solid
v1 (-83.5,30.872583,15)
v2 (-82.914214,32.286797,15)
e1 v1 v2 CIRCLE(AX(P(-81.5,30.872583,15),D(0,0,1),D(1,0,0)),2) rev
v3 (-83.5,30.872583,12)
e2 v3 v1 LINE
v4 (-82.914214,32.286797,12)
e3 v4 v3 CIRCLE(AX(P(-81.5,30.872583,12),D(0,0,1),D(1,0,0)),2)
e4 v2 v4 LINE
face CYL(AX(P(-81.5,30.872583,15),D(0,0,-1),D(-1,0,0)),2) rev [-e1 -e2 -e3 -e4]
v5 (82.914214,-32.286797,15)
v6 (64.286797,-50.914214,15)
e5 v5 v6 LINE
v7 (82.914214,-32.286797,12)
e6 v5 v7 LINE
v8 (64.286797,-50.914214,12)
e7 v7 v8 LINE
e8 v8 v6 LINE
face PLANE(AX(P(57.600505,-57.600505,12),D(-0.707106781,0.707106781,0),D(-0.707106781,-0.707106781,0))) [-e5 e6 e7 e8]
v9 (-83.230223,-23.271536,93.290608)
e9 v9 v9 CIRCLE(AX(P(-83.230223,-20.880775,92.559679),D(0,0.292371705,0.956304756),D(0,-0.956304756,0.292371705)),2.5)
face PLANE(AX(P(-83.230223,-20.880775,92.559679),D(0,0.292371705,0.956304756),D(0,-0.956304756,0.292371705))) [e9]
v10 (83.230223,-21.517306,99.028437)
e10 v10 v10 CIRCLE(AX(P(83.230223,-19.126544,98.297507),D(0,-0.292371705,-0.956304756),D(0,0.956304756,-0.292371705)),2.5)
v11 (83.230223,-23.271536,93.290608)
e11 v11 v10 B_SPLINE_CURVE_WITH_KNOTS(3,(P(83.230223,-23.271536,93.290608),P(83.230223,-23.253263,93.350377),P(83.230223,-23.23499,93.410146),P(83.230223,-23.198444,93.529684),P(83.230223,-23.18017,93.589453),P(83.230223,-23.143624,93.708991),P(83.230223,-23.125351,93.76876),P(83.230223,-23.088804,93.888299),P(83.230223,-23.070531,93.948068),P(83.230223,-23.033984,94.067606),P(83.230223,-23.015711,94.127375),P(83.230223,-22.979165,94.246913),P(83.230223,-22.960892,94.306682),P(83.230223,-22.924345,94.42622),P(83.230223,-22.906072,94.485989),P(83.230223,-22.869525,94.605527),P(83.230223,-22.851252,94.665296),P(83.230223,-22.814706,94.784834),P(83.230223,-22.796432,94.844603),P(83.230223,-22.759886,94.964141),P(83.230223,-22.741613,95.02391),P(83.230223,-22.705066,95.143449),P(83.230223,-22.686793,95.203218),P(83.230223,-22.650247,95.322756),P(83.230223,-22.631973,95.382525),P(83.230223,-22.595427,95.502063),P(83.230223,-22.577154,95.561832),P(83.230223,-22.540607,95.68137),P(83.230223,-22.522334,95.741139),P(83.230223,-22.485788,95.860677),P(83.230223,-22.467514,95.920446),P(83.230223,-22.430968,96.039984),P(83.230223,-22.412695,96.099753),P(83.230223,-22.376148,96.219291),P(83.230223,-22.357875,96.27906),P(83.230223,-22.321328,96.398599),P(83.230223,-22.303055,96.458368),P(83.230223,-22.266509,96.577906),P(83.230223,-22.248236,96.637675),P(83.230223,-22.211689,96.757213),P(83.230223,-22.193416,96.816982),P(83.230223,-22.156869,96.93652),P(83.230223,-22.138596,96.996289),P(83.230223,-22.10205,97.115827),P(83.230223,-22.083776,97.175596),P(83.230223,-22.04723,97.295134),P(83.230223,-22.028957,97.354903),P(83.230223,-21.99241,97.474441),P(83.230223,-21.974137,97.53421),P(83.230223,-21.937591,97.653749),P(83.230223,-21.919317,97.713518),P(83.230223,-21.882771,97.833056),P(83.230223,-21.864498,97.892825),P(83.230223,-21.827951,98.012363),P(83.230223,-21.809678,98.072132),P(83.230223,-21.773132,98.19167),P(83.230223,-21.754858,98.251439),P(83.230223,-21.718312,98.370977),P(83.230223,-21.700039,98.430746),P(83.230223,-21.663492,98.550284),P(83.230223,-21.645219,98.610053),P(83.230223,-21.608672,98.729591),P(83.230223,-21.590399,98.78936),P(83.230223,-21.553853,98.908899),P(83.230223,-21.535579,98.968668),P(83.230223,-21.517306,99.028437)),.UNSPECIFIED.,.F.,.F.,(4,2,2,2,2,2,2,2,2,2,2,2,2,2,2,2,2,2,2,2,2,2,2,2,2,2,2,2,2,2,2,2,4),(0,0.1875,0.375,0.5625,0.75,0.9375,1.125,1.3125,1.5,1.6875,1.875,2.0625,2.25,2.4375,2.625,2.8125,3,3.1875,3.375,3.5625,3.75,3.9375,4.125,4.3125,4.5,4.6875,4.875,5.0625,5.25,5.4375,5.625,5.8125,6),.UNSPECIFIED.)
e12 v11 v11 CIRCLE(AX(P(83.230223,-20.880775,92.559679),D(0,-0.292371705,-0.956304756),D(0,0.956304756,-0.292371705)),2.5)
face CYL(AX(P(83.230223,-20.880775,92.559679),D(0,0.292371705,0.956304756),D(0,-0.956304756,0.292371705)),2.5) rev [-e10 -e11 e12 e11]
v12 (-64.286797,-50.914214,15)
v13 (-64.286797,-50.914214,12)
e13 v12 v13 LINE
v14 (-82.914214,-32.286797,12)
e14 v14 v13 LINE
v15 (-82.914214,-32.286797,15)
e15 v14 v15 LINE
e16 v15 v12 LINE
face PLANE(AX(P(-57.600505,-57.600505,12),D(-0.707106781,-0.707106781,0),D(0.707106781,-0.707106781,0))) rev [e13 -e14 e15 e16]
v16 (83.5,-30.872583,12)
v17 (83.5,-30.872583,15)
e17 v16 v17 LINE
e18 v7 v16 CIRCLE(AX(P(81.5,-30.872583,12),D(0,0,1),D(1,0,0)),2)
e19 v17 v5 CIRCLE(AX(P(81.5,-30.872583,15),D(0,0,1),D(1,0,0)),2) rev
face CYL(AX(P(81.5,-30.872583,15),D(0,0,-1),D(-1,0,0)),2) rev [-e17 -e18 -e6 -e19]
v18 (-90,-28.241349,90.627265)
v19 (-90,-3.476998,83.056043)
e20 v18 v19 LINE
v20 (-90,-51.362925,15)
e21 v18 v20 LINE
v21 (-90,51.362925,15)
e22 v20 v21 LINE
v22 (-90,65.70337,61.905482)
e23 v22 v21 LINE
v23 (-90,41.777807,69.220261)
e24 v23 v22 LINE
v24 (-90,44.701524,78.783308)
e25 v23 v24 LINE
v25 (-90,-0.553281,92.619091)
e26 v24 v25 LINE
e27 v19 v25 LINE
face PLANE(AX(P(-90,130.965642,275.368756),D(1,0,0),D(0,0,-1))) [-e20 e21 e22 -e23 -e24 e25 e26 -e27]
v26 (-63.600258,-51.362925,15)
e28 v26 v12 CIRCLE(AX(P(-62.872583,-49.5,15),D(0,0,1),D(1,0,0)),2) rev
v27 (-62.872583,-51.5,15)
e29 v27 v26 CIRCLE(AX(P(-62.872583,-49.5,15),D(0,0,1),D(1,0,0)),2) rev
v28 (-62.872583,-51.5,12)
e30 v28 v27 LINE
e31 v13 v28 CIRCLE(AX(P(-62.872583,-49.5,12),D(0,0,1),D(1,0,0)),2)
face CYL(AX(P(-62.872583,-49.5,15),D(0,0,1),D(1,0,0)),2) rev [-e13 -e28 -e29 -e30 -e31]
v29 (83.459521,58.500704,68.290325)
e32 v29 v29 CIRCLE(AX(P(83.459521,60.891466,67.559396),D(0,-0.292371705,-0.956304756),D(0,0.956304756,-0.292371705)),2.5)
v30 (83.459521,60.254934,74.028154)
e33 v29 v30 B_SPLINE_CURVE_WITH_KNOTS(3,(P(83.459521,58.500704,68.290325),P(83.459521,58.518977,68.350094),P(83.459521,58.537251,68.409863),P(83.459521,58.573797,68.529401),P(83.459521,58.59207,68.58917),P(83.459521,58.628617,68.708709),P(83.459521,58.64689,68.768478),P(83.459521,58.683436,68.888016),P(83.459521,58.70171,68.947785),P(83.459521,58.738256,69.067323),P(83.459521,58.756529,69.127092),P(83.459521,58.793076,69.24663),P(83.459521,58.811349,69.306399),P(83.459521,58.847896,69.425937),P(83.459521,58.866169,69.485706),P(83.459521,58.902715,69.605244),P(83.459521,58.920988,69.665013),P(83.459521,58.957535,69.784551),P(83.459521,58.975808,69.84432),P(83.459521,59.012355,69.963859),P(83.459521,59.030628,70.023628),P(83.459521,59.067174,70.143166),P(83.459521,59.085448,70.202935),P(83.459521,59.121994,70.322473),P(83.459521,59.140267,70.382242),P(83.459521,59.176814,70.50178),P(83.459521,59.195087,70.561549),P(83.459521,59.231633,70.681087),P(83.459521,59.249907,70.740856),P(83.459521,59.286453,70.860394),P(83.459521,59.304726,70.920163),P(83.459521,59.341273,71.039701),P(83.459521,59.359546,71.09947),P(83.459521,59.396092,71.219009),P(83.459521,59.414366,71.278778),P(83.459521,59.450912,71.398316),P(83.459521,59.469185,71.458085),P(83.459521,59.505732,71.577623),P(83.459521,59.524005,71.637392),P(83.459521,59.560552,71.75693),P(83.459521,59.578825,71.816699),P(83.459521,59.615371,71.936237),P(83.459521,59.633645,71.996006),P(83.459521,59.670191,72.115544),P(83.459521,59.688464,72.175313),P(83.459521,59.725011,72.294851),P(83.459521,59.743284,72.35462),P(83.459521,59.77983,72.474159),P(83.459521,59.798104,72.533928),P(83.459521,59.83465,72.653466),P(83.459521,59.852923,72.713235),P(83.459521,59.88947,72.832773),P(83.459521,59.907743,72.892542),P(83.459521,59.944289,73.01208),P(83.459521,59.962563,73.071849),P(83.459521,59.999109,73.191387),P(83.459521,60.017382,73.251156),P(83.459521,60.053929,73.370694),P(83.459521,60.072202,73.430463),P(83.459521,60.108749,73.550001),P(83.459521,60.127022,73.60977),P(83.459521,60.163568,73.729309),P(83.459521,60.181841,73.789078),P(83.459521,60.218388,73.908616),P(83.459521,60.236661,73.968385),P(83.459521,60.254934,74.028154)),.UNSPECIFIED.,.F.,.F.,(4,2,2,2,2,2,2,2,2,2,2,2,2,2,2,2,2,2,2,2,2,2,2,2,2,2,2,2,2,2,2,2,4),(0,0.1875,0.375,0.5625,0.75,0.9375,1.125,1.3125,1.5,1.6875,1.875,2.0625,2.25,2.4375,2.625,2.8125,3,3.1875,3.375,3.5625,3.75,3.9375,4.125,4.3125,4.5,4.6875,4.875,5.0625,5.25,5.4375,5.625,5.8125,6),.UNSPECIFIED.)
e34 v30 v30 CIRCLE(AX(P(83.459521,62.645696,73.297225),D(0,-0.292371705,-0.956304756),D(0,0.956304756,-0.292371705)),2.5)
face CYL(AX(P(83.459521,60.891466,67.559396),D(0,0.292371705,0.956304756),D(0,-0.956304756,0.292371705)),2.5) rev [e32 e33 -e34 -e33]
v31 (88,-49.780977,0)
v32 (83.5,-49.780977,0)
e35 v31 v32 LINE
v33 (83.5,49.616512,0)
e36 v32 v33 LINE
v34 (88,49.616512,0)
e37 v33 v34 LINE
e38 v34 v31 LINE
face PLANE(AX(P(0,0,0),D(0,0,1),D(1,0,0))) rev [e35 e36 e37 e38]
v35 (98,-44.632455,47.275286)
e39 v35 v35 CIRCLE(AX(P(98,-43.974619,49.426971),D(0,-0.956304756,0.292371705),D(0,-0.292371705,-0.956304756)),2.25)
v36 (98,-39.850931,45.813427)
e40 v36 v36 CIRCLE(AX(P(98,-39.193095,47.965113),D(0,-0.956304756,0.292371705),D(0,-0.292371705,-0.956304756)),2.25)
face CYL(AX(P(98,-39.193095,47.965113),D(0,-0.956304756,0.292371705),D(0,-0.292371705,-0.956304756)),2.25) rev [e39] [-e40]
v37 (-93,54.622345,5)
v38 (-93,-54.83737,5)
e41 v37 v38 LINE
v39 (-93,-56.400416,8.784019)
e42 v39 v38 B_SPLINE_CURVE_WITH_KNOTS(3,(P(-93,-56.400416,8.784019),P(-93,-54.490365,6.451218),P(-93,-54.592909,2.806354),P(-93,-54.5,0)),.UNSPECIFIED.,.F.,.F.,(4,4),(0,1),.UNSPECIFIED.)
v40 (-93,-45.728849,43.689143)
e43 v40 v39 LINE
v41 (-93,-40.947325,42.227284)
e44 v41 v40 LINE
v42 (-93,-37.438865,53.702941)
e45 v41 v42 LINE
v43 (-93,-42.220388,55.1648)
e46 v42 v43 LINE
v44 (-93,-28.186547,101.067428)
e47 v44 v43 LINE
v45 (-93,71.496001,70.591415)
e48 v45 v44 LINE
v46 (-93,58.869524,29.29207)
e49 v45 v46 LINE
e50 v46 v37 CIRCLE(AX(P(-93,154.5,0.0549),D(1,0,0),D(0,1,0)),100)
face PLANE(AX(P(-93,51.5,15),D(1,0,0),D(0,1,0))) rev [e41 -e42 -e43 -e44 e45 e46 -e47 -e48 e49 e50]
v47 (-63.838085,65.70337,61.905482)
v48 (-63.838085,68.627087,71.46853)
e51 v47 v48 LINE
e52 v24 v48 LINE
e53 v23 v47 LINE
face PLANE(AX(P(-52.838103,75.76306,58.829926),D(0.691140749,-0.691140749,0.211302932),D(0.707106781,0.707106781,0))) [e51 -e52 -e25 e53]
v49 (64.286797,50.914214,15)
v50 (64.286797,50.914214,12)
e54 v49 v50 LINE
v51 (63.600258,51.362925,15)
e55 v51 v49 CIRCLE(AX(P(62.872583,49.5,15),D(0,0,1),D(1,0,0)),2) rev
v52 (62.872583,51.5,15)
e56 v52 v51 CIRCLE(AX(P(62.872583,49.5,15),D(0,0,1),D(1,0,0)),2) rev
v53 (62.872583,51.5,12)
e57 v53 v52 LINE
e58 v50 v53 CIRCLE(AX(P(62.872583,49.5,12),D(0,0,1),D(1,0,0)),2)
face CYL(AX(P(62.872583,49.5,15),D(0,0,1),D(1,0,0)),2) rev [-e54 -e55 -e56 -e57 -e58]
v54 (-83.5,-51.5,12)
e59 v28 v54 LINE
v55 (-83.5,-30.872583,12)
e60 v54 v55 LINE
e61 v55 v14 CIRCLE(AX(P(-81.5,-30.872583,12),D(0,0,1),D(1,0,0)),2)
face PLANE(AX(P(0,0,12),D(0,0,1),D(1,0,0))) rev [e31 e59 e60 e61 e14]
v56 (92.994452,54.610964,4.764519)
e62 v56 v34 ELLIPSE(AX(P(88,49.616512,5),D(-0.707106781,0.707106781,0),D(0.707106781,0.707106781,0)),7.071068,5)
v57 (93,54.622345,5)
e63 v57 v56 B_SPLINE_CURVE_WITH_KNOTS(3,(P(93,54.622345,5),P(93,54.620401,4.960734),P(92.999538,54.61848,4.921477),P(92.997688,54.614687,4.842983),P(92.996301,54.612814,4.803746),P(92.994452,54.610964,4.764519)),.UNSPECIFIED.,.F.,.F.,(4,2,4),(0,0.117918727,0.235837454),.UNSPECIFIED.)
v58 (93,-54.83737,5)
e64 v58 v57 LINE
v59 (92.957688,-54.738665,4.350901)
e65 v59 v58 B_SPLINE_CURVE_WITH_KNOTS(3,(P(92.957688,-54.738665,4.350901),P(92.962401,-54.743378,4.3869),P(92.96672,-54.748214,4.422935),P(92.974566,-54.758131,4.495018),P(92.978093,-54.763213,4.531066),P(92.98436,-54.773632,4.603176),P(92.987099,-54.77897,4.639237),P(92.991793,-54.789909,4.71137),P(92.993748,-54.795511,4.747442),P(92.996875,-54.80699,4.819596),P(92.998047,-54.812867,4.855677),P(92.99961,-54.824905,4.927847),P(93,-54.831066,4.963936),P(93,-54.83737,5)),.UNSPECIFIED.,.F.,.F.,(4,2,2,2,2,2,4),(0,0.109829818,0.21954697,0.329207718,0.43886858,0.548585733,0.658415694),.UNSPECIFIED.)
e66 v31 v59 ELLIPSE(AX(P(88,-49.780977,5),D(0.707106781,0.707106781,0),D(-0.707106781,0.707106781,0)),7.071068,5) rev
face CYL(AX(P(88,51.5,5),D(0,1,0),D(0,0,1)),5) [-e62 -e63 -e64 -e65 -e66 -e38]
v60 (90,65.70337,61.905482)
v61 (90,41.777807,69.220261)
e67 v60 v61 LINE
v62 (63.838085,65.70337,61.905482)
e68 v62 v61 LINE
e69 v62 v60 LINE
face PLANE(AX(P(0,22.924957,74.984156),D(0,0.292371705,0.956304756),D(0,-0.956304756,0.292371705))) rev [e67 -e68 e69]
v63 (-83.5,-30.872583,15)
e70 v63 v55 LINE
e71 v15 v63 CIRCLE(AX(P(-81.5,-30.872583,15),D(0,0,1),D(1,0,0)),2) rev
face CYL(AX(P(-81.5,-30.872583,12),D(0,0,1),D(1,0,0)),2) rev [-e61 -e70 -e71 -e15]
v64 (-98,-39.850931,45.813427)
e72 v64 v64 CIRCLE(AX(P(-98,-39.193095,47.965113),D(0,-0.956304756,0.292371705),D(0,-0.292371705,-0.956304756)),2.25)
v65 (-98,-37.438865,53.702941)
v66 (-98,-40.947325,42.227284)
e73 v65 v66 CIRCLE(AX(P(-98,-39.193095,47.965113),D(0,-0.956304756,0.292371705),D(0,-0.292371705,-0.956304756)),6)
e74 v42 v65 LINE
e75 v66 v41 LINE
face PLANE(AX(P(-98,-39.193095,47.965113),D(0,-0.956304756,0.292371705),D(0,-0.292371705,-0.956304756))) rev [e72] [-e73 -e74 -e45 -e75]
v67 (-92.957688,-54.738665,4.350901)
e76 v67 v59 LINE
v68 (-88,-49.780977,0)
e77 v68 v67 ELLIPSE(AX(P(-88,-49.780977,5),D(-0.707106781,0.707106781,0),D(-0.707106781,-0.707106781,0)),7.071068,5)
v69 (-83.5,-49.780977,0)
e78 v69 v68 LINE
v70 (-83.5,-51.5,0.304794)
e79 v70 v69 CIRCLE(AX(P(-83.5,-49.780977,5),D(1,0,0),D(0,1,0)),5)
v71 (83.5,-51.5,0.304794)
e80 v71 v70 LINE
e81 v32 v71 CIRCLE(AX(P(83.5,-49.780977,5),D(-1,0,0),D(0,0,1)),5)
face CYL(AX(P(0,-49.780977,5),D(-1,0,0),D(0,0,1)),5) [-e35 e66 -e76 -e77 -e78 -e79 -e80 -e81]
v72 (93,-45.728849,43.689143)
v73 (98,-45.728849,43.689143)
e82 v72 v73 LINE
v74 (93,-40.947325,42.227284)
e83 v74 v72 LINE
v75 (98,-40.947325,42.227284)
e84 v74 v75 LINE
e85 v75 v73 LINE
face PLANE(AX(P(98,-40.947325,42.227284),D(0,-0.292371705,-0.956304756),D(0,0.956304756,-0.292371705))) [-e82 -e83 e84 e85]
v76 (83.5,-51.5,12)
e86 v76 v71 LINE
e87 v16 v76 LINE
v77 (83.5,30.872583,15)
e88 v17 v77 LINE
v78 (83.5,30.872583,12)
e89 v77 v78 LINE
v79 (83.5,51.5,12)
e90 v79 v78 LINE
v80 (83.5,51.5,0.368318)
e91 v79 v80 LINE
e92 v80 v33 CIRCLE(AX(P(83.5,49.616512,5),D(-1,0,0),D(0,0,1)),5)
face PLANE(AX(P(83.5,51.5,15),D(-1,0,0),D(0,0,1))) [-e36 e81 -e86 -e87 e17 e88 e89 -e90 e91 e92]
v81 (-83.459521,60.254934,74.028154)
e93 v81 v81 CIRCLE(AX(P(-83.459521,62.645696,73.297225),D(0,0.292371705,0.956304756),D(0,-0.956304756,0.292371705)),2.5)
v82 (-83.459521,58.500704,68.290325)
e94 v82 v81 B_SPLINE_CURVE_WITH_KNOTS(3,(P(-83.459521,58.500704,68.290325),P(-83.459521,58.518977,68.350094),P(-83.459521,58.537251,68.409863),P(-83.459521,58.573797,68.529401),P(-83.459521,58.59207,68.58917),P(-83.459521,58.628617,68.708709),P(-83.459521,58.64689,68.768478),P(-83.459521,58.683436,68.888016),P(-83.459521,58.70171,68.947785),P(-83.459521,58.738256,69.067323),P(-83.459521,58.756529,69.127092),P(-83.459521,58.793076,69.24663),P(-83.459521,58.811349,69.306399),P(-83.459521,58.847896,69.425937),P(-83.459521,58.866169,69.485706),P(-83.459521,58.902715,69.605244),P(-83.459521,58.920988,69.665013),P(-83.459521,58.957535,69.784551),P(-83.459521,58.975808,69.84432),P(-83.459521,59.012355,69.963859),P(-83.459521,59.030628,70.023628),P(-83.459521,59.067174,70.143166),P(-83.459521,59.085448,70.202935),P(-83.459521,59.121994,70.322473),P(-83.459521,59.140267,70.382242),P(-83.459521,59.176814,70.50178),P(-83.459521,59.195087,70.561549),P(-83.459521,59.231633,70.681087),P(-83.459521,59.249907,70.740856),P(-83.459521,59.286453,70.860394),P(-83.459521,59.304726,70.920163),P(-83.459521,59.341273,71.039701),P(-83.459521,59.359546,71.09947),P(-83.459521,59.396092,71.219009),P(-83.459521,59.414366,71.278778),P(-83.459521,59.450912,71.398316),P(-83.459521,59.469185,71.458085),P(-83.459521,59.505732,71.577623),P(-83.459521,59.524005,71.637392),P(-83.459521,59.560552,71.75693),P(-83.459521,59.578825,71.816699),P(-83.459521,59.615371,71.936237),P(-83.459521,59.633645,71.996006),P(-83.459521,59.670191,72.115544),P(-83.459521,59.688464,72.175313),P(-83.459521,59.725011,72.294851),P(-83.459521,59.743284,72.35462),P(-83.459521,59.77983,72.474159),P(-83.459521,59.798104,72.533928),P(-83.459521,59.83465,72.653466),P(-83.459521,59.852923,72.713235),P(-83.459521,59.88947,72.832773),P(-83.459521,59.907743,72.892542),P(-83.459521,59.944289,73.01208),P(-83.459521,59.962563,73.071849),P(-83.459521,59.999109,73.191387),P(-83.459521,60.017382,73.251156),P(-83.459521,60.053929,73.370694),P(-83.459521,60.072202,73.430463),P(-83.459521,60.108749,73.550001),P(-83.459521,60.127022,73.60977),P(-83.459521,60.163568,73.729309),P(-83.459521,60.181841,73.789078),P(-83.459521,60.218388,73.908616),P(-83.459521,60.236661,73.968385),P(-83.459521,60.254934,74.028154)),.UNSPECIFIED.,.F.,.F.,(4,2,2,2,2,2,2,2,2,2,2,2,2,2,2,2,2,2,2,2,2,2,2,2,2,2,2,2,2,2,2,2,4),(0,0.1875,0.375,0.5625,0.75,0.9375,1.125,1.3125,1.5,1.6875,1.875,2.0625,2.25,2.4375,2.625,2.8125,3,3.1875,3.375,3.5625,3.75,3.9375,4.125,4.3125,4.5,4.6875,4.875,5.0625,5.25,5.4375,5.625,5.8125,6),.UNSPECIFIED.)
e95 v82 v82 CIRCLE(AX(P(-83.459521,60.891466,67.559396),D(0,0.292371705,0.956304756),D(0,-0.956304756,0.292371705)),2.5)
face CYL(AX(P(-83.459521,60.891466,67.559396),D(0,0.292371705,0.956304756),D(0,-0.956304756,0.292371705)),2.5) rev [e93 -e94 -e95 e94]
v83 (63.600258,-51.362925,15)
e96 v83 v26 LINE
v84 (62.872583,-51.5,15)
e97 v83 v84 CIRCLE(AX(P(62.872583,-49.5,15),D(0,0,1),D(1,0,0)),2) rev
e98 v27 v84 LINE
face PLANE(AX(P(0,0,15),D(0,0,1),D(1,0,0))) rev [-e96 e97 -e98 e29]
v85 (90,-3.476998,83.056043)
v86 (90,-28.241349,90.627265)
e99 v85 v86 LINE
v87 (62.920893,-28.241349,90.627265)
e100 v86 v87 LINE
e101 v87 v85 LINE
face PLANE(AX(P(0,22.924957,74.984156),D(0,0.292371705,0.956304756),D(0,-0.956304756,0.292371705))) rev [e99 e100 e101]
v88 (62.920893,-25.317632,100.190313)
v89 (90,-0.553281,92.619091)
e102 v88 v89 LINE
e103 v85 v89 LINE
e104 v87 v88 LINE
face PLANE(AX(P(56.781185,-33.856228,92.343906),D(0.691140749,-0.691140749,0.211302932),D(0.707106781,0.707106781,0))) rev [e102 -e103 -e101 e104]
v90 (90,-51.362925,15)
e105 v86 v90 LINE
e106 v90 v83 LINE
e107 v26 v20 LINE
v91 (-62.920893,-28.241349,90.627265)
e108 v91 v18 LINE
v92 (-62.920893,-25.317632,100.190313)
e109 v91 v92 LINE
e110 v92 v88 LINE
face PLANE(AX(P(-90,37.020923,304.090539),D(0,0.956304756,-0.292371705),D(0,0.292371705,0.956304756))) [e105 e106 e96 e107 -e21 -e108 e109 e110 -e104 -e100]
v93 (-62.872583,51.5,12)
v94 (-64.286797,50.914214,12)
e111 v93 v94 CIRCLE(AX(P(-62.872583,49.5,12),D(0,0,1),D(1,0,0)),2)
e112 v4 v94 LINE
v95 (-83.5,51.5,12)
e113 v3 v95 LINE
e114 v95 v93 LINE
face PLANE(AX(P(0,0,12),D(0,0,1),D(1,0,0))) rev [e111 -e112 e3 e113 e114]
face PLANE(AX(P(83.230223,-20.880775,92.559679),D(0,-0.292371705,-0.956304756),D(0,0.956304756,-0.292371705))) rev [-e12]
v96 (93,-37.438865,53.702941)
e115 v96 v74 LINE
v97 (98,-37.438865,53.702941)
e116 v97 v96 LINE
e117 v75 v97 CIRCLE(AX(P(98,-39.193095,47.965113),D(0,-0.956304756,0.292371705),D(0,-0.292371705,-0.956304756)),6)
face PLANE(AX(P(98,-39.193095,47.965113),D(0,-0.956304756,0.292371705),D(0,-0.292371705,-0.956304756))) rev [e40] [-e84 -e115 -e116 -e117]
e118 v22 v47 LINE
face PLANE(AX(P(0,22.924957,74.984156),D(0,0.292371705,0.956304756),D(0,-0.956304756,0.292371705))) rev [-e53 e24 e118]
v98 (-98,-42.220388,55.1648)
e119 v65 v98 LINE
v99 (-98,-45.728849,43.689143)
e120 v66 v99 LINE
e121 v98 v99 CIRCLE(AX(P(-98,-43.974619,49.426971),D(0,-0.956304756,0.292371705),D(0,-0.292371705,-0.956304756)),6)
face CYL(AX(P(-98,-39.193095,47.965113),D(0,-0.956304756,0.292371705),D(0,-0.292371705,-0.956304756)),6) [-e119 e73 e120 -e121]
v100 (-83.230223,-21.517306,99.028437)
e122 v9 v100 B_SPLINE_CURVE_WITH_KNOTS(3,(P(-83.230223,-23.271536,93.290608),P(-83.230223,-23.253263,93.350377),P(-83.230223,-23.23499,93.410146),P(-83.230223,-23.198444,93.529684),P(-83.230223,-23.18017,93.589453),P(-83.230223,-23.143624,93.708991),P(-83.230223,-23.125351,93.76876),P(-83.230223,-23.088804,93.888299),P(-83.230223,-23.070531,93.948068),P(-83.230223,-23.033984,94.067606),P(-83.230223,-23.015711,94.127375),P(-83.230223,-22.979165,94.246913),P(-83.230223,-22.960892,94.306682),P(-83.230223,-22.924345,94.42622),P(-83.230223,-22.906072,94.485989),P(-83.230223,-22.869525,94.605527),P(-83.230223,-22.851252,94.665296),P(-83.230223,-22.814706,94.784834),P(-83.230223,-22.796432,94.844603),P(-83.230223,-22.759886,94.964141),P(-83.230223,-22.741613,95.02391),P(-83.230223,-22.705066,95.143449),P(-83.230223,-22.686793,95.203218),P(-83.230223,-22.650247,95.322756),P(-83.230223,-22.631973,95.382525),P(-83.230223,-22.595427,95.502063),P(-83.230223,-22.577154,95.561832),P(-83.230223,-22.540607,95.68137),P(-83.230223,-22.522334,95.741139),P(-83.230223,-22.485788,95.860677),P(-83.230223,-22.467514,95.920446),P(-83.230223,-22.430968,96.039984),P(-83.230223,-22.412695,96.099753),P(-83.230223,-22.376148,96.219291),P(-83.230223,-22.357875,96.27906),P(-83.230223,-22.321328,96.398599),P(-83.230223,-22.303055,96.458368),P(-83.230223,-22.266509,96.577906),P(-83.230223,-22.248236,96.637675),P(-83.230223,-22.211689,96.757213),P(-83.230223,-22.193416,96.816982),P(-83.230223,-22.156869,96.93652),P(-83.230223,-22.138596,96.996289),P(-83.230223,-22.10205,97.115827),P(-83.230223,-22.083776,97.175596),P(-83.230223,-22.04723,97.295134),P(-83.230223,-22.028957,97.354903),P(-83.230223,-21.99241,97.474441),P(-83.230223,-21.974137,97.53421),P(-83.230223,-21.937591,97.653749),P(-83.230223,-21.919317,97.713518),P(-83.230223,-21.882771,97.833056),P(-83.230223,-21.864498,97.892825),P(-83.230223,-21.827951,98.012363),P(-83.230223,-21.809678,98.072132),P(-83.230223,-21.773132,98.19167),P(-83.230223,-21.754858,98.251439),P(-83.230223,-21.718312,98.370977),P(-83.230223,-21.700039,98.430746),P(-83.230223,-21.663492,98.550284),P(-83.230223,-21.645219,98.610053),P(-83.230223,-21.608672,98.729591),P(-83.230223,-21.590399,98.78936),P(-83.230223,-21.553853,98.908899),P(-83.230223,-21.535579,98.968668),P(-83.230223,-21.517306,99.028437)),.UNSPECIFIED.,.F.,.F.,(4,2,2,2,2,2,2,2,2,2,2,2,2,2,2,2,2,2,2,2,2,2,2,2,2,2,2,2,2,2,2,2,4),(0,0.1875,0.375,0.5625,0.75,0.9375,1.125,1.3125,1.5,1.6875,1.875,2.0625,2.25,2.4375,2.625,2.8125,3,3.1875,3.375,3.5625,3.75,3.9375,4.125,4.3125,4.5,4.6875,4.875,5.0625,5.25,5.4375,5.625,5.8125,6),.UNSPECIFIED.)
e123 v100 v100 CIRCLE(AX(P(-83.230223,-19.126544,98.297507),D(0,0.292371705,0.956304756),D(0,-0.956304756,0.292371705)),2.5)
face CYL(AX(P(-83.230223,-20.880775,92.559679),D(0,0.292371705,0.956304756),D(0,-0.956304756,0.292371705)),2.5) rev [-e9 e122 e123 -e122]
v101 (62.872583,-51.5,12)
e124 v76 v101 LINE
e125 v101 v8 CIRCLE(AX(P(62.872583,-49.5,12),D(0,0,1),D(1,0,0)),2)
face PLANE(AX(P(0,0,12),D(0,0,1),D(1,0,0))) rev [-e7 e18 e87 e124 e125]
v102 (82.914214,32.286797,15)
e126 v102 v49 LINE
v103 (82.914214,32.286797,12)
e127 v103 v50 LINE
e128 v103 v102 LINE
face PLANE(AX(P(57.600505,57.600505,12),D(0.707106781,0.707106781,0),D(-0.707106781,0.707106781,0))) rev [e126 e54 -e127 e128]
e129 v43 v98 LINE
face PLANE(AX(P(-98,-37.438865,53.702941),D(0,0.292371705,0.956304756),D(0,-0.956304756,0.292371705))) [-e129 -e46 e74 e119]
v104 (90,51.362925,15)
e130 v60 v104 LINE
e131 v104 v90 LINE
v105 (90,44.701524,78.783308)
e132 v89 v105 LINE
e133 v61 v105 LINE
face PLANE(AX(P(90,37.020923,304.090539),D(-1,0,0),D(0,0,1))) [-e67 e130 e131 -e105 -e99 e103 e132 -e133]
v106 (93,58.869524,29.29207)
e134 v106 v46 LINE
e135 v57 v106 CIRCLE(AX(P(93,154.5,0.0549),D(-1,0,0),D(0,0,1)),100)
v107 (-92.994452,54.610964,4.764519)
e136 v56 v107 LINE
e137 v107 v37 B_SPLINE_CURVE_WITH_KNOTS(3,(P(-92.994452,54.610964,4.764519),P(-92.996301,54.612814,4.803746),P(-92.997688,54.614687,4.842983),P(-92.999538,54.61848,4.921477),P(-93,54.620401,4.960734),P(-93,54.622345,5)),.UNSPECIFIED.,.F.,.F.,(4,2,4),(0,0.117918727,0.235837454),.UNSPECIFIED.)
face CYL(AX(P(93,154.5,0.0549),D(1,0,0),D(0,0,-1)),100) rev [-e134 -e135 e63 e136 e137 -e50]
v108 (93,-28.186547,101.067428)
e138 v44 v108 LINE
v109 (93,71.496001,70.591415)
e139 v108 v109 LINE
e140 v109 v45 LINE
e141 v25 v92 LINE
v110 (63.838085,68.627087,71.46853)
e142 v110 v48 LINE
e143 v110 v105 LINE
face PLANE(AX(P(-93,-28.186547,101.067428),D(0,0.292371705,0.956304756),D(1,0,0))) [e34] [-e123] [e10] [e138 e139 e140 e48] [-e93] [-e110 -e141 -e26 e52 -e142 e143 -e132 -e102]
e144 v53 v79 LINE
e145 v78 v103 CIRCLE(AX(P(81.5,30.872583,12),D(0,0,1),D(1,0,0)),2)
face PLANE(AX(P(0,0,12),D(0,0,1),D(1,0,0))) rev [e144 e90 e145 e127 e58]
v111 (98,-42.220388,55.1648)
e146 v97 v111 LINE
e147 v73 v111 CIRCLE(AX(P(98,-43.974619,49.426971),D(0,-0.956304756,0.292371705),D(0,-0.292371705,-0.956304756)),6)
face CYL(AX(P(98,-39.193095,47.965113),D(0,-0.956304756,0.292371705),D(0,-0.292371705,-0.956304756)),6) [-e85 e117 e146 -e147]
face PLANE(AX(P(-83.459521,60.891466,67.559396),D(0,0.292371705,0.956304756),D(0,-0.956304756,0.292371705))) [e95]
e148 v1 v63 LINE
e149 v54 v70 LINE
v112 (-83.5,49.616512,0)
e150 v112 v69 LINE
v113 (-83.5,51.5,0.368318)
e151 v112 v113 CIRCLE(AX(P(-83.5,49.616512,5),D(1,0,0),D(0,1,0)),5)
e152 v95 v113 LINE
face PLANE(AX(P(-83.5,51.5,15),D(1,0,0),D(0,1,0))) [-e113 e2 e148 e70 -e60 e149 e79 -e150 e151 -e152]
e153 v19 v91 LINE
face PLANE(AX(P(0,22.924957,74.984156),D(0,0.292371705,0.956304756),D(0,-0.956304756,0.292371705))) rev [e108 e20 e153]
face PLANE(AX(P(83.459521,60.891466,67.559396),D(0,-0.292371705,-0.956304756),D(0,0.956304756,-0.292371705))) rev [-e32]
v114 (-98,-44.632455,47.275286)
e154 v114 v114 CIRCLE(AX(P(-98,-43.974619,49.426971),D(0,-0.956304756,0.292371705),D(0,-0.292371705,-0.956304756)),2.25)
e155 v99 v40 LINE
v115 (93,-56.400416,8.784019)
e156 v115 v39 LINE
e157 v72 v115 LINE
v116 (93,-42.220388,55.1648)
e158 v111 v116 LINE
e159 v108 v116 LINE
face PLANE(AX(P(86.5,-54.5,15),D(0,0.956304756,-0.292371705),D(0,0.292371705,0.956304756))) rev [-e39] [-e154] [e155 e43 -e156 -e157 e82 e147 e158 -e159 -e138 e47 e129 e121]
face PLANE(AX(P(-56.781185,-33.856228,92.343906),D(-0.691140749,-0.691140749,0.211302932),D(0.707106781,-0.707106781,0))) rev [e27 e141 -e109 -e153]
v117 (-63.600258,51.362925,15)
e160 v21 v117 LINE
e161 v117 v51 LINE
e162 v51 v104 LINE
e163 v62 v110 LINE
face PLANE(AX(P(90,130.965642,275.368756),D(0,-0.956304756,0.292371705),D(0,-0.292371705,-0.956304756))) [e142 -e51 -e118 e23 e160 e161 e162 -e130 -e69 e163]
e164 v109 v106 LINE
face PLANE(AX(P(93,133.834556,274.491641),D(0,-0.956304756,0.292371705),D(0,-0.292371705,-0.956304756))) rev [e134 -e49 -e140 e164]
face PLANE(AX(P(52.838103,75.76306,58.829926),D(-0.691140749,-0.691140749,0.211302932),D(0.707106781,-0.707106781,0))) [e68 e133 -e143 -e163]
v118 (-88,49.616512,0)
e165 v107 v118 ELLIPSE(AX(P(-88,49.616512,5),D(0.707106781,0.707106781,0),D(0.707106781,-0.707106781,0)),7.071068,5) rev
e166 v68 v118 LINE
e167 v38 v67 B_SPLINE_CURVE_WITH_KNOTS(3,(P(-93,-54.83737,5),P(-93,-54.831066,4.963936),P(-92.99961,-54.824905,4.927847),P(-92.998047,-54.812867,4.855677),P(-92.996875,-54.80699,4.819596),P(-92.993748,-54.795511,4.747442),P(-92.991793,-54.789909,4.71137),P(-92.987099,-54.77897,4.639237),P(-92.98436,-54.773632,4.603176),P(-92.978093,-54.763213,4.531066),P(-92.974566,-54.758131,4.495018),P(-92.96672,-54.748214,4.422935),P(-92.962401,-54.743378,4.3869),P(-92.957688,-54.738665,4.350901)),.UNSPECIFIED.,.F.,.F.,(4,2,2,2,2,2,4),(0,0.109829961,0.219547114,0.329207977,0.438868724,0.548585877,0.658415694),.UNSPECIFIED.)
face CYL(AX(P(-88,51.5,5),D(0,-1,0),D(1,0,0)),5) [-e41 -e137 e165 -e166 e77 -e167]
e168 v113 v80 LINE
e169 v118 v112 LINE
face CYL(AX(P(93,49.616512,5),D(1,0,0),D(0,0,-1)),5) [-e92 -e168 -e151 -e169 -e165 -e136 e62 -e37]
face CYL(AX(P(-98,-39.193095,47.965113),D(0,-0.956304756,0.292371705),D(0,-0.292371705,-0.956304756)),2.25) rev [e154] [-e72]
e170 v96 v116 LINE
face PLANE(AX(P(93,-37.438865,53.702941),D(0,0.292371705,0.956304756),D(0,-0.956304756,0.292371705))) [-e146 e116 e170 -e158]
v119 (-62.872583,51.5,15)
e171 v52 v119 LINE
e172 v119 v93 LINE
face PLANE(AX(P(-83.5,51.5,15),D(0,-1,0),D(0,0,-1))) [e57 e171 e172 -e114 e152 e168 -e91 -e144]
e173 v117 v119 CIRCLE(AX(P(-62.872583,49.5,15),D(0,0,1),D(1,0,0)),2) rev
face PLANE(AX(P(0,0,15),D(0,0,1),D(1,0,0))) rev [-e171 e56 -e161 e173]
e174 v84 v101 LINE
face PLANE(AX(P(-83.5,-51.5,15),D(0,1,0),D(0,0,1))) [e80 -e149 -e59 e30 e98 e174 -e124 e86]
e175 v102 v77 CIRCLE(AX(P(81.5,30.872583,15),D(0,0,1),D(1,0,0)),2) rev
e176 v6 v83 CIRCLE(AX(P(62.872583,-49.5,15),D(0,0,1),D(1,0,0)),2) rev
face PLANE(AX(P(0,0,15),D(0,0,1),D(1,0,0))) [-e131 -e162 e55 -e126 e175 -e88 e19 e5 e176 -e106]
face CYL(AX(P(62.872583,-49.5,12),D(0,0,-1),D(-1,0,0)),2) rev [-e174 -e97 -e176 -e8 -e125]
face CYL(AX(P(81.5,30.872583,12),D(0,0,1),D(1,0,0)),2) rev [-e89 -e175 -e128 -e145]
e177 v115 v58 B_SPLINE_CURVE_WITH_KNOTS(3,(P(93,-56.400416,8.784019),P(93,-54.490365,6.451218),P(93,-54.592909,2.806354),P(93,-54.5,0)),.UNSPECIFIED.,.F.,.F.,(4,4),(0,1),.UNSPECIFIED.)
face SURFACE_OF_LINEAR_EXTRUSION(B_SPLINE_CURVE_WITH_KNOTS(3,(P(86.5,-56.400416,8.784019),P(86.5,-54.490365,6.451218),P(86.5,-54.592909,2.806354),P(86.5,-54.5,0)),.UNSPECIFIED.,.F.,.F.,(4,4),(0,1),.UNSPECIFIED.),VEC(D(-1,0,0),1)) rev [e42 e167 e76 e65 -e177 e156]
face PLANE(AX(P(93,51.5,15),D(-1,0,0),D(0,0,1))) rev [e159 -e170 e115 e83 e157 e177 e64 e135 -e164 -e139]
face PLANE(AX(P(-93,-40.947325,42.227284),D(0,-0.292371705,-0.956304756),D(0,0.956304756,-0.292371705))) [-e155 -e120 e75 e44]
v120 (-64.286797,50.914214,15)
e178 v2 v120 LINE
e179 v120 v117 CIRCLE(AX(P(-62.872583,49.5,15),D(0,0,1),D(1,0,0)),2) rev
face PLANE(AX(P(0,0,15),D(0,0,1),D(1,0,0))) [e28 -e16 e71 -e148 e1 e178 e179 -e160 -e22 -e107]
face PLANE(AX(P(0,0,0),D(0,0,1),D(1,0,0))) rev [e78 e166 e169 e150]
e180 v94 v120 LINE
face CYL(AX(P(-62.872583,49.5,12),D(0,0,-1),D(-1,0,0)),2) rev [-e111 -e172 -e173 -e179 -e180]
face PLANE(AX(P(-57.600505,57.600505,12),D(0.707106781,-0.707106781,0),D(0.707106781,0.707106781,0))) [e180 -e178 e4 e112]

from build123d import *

# Parameters (mm, degrees)
SKETCH1_W                = 173
SKETCH1_H                = 109
SKETCH1_W_2              = 167
SKETCH1_H_2              = 103
EXTRUDE_THIN1_DEPTH      = 15
BOSS_EXTRUDE1_DEPTH      = 3
BOSS_EXTRUDE2_DEPTH      = 86.5
BOSS_EXTRUDE2_DEPTH_BACK = 86.5
MOVE_START               = 86.5
MOVE_FACE1_DEPTH         = 6.5
MOVE_START_2             = -93
MOVE_FACE2_DEPTH         = 6.5
BOSS_EXTRUDE3_START      = -93
BOSS_EXTRUDE3_DEPTH      = 186
BOSS_EXTRUDE3_2_DEPTH    = 3
BOSS_EXTRUDE3_START_2    = 90
BOSS_EXTRUDE3_3_DEPTH    = 3
FILLET3_R                = 100
FILLET2_R                = 2
SKETCH8_R                = 2.5
BOSS_EXTRUDE4_DEPTH      = 10
SKETCH8_3_R              = 2.5
CUT_EXTRUDE1_DEPTH       = 6
SKETCH9_R                = 2.25
BOSS_EXTRUDE5_DEPTH      = 5
FILLET4_R                = 5


# Read off the part's stored shape, not the designer's step: Move Face1, Move Face2, Boss-Extrude3
with BuildPart() as part:
    # Sketch1 → Extrude-Thin1 (new body)
    with BuildSketch(Plane.XY):
        Rectangle(SKETCH1_W, SKETCH1_H)
        Rectangle(SKETCH1_W_2, SKETCH1_H_2, mode=Mode.SUBTRACT)
    extrude(amount=EXTRUDE_THIN1_DEPTH)

    # Sketch2 → Boss-Extrude1 (add)
    with BuildSketch(Plane.XY.offset(15)):
        Polygon((63.701010127, 51.5), (83.5, 31.701010127), (83.5, 51.5), align=None)
        Polygon((-83.5, 51.5), (-83.5, 31.701010127), (-63.701010127, 51.5), align=None)
        Polygon((83.5, -31.701010127), (63.701010127, -51.5), (83.5, -51.5), align=None)
        Polygon((-83.5, -31.701010127), (-83.5, -51.5), (-63.701010127, -51.5), align=None)
    extrude(amount=-BOSS_EXTRUDE1_DEPTH)

    # Sketch5 → Boss-Extrude2 (add, two sides: drawn at the far end of the back side and taken through both)
    with BuildSketch(Plane(origin=(0, 0, 0), x_dir=(0, 0, -1), z_dir=(1, 0, 0)).offset(-BOSS_EXTRUDE2_DEPTH_BACK)):
        with BuildLine():
            Line((-15, -54.5), (-8.784019086, -56.400416081))
            add(Edge.make_bspline(
                [(0, -54.5), (-2.80635361, -54.592909142), (-6.451217818, -54.49036495), (-8.784019086, -56.400416081)],
                knots=[0, 0, 0, 0, 1, 1, 1, 1], degree=3))
            Line((0, -54.5), (-15, -54.5))
        make_face()
    extrude(amount=BOSS_EXTRUDE2_DEPTH + BOSS_EXTRUDE2_DEPTH_BACK)

    # Move Face1 outline → Move Face1 (add)
    with BuildSketch(Plane.YZ.offset(MOVE_START)):
        with BuildLine():
            Line((-54.5, 15), (-56.400416081, 8.784019086))
            add(Edge.make_bspline(
                [(-56.400416081, 8.784019086), (-54.49036495, 6.451217818), (-54.592909142, 2.80635361), (-54.5, 0)],
                knots=[0, 0, 0, 0, 1, 1, 1, 1], degree=3))
            Line((-54.5, 0), (54.5, 0))
            Line((54.5, 0), (54.5, 15))
            Line((54.5, 15), (-54.5, 15))
        make_face()
    extrude(amount=MOVE_FACE1_DEPTH)

    # Move Face2 outline → Move Face2 (add)
    with BuildSketch(Plane.YZ.offset(MOVE_START_2)):
        with BuildLine():
            Line((-54.5, 15), (-56.400416081, 8.784019086))
            add(Edge.make_bspline(
                [(-56.400416081, 8.784019086), (-54.49036495, 6.451217818), (-54.592909142, 2.80635361), (-54.5, 0)],
                knots=[0, 0, 0, 0, 1, 1, 1, 1], degree=3))
            Line((-54.5, 0), (54.5, 0))
            Line((54.5, 0), (54.5, 15))
            Line((54.5, 15), (-54.5, 15))
        make_face()
    extrude(amount=MOVE_FACE2_DEPTH)

    # Boss-Extrude3 outline → Boss-Extrude3 (add)
    with BuildSketch(Plane.YZ.offset(BOSS_EXTRUDE3_START)):
        Polygon((-28.186546575, 101.067428037), (-54.5, 15), (-51.362924731, 15), (-25.317632307, 100.190312923), align=None)
        Polygon((71.496001129, 70.591414798), (68.627086861, 71.468529912), (51.362924731, 15), (54.5, 15), align=None)
    extrude(amount=BOSS_EXTRUDE3_DEPTH)

    # Boss-Extrude3 2 outline → Boss-Extrude3 2 (add)
    with BuildSketch(Plane.YZ.offset(BOSS_EXTRUDE3_START)):
        Polygon((68.627086861, 71.468529912), (-25.317632307, 100.190312923), (-51.362924731, 15), (51.362924731, 15), align=None)
    extrude(amount=BOSS_EXTRUDE3_2_DEPTH)

    # Boss-Extrude3 3 outline → Boss-Extrude3 3 (add)
    with BuildSketch(Plane.YZ.offset(BOSS_EXTRUDE3_START_2)):
        Polygon((68.627086861, 71.468529912), (-25.317632307, 100.190312923), (-51.362924731, 15), (51.362924731, 15), align=None)
    extrude(amount=BOSS_EXTRUDE3_3_DEPTH)

    # Fillet3
    fillet3_edges = [part.edges().sort_by_distance(p)[0] for p in [
        (0, 54.5, 15),
    ]]
    fillet(fillet3_edges, radius=FILLET3_R)

    # Fillet2
    # the kernel refuses this fillet: 2 mm, written as the material it adds along each edge
    with BuildSketch(Plane(origin=(83.5, 31.701010127, 15), x_dir=(0, -1, 0), z_dir=(0, 0, -1)), Plane(origin=(-63.701010127, 51.5, 15), x_dir=(1, 0, 0), z_dir=(0, 0, -1)), Plane(origin=(63.701010127, -51.5, 15), x_dir=(-1, 0, 0), z_dir=(0, 0, -1)), Plane(origin=(-83.5, -31.701010127, 15), x_dir=(0, 1, 0), z_dir=(0, 0, -1))) as fillet2_piece_1:
        with BuildLine():
            CenterArc((FILLET2_R * 0.414213562373, FILLET2_R), FILLET2_R, 225, 45)
            Line((-FILLET2_R * 0.292893218813, FILLET2_R * 0.292893218813), (0, 0))
            Line((0, 0), (FILLET2_R * 0.414213562373, 0))
        make_face()
    extrude(amount=3)
    with BuildSketch(Plane(origin=(63.701010127, 51.5, 15), x_dir=(-1, 0, 0), z_dir=(0, 0, -1)), Plane(origin=(-83.5, 31.701010127, 15), x_dir=(0, -1, 0), z_dir=(0, 0, -1)), Plane(origin=(83.5, -31.701010127, 15), x_dir=(0, 1, 0), z_dir=(0, 0, -1)), Plane(origin=(-63.701010127, -51.5, 15), x_dir=(1, 0, 0), z_dir=(0, 0, -1))) as fillet2_piece_2:
        with BuildLine():
            CenterArc((FILLET2_R * 0.414213562373, -FILLET2_R), FILLET2_R, 90, 45)
            Line((-FILLET2_R * 0.292893218813, -FILLET2_R * 0.292893218813), (0, 0))
            Line((0, 0), (FILLET2_R * 0.414213562373, 0))
        make_face()
    extrude(amount=3)

    # Sketch8 → Boss-Extrude4 (add)
    # profile 1 of 8: a face of its own
    with BuildSketch(Plane(origin=(0, 25.848674053, 84.547203211), x_dir=(1, 0, 0), z_dir=(0, 0.2923717047227412, 0.9563047559630341))):
        Polygon((-90, 19.714270268), (-63.838085396, 44.733033629), (-90, 44.733033629), align=None)
        with Locations((-83.459521349, 38.478342789)):
            Circle(SKETCH8_R, mode=Mode.SUBTRACT)
    # profile 2 of 8: a face of its own
    with BuildSketch(Plane(origin=(0, 25.848674053, 84.547203211), x_dir=(1, 0, 0), z_dir=(0, 0.2923717047227412, 0.9563047559630341))):
        with Locations((-83.459521349, 38.478342789)):
            Circle(SKETCH8_R)
    # profile 3 of 8: a face of its own
    with BuildSketch(Plane(origin=(0, 25.848674053, 84.547203211), x_dir=(1, 0, 0), z_dir=(0, 0.2923717047227412, 0.9563047559630341))):
        Polygon((62.943139485, -53.504184771), (90, -53.504184771), (90, -27.608306296), (62.920893352, -53.504184771), align=None)
        with Locations((83.230223338, -47.030215152)):
            Circle(SKETCH8_R, mode=Mode.SUBTRACT)
    # profile 4 of 8: a face of its own
    with BuildSketch(Plane(origin=(0, 25.848674053, 84.547203211), x_dir=(1, 0, 0), z_dir=(0, 0.2923717047227412, 0.9563047559630341))):
        with Locations((83.230223338, -47.030215152)):
            Circle(SKETCH8_R)
    # profile 5 of 8: a face of its own
    with BuildSketch(Plane(origin=(0, 25.848674053, 84.547203211), x_dir=(1, 0, 0), z_dir=(0, 0.2923717047227412, 0.9563047559630341))):
        Polygon((-90, -53.504184771), (-62.920893352, -53.504184771), (-90, -27.608306296), align=None)
        with Locations((-83.230223338, -47.030215152)):
            Circle(SKETCH8_R, mode=Mode.SUBTRACT)
    # profile 6 of 8: a face of its own
    with BuildSketch(Plane(origin=(0, 25.848674053, 84.547203211), x_dir=(1, 0, 0), z_dir=(0, 0.2923717047227412, 0.9563047559630341))):
        with Locations((-83.230223338, -47.030215152)):
            Circle(SKETCH8_R)
    # profile 7 of 8: a face of its own
    with BuildSketch(Plane(origin=(0, 25.848674053, 84.547203211), x_dir=(1, 0, 0), z_dir=(0, 0.2923717047227412, 0.9563047559630341))):
        Polygon((63.838085396, 44.733033629), (90, 19.714270268), (90, 44.733033629), align=None)
        with Locations((83.459521349, 38.478342789)):
            Circle(SKETCH8_R, mode=Mode.SUBTRACT)
    # profile 8 of 8: a face of its own
    with BuildSketch(Plane(origin=(0, 25.848674053, 84.547203211), x_dir=(1, 0, 0), z_dir=(0, 0.2923717047227412, 0.9563047559630341))):
        with Locations((83.459521349, 38.478342789)):
            Circle(SKETCH8_R)
    extrude(amount=-BOSS_EXTRUDE4_DEPTH)

    # Sketch8<3> → Cut-Extrude1 (cut)
    with BuildSketch(Plane(origin=(0, 25.848674053, 84.547203211), x_dir=(1, 0, 0), z_dir=(0, 0.2923717047227412, 0.9563047559630341))):
        with Locations(Location((-83.459521349, 38.478342789, 0), (0, 0, 270))):
            Circle(SKETCH8_3_R)
        with Locations(Location((83.459521349, 38.478342789, 0), (0, 0, 270))):
            Circle(SKETCH8_3_R)
        with Locations(Location((-83.230223338, -47.030215152, 0), (0, 0, 270))):
            Circle(SKETCH8_3_R)
        with Locations(Location((83.230223338, -47.030215152, 0), (0, 0, 270))):
            Circle(SKETCH8_3_R)
    extrude(amount=-CUT_EXTRUDE1_DEPTH, mode=Mode.SUBTRACT)

    # Sketch9 → Boss-Extrude5 (add)
    # profile 1 of 2: a face of its own
    with BuildSketch(Plane(origin=(0, -54.035220628, 16.520224825), x_dir=(1, 0, 0), z_dir=(0, -0.956304755963037, 0.29237170472273216))):
        with BuildLine():
            Line((-98, 40.410313432), (-93, 40.410313432))
            Line((-93, 40.410313432), (-93, 28.410313432))
            Line((-93, 28.410313432), (-98, 28.410313432))
            ThreePointArc((-98, 28.410313432), (-104, 34.410313432), (-98, 40.410313432))
        make_face()
        with Locations(Location((-98, 34.410313432, 0), (0, 0, 270))):
            Circle(SKETCH9_R, mode=Mode.SUBTRACT)
    # profile 2 of 2: a face of its own
    with BuildSketch(Plane(origin=(0, -54.035220628, 16.520224825), x_dir=(1, 0, 0), z_dir=(0, -0.956304755963037, 0.29237170472273216))):
        with BuildLine():
            Line((93, 40.410313432), (98, 40.410313432))
            ThreePointArc((98, 40.410313432), (104, 34.410313432), (98, 28.410313432))
            Line((98, 28.410313432), (93, 28.410313432))
            Line((93, 28.410313432), (93, 40.410313432))
        make_face()
        with Locations(Location((98, 34.410313432, 0), (0, 0, 270))):
            Circle(SKETCH9_R, mode=Mode.SUBTRACT)
    extrude(amount=-BOSS_EXTRUDE5_DEPTH)

    # Fillet4
    # the kernel refuses this fillet: 5 mm, written as the material it takes off along each edge
    with BuildSketch(Plane(origin=(-93, -67, 0), x_dir=(1, 0, 0), z_dir=(0, 1, 0))) as fillet4_piece_1:
        with BuildLine():
            CenterArc((FILLET4_R, -FILLET4_R), FILLET4_R, 90, 90)
            Line((0, -FILLET4_R), (-FILLET4_R * 0.02, -FILLET4_R))
            Line((-FILLET4_R * 0.02, -FILLET4_R), (-FILLET4_R * 0.02, FILLET4_R * 0.02))
            Line((-FILLET4_R * 0.02, FILLET4_R * 0.02), (FILLET4_R, FILLET4_R * 0.02))
            Line((FILLET4_R, FILLET4_R * 0.02), (FILLET4_R, 0))
        make_face()
    extrude(amount=134, mode=Mode.SUBTRACT)
    with BuildSketch(Plane(origin=(86.5, -54.5, 0), x_dir=(0, 1, 0), z_dir=(-1, 0, 0)), Plane(origin=(0, -54.5, 0), x_dir=(0, 1, 0), z_dir=(-1, 0, 0))) as fillet4_piece_2:
        with BuildLine():
            CenterArc((4.719023174, -5), FILLET4_R, 90, 82.540825882)
            Line((-0.238664904, -4.350901455), (-0.337818666, -4.337919484))
            ThreePointArc((-0.337818666, -4.337919484), (-0.165294679, -2.173525325), (-0.099945242, 0.003308858))
            Line((-0.099945242, 0.003308858), (0, 0.1))
            Line((0, 0.1), (4.719023174, 0.1))
            Line((4.719023174, 0.1), (4.719023174, 0))
        make_face()
    extrude(amount=86.5, mode=Mode.SUBTRACT)
    with BuildSketch(Plane(origin=(105.208719161, 54.5, 0), x_dir=(0, -1, 0), z_dir=(-1, 0, 0))) as fillet4_piece_3:
        with BuildLine():
            CenterArc((4.883487664, 5), FILLET4_R, 182.699411552, 87.300588448)
            Line((-0.110964129, 4.764519041), (-0.610409308, 4.740970945))
            ThreePointArc((-0.610409308, 4.740970945), (-0.5, 0.054899865), (-0.5, 0))
            Line((-0.5, 0), (0, -0.5))
            Line((0, -0.5), (4.883487664, -0.5))
            Line((4.883487664, -0.5), (4.883487664, 0))
        make_face()
    extrude(amount=210.417438322, mode=Mode.SUBTRACT)
    with BuildSketch(Plane(origin=(93, -67, 0), x_dir=(-1, 0, 0), z_dir=(0, 1, 0))) as fillet4_piece_4:
        with BuildLine():
            CenterArc((FILLET4_R, FILLET4_R), FILLET4_R, 180, 90)
            Line((0, FILLET4_R), (-FILLET4_R * 0.02, FILLET4_R))
            Line((-FILLET4_R * 0.02, FILLET4_R), (-FILLET4_R * 0.02, -FILLET4_R * 0.02))
            Line((-FILLET4_R * 0.02, -FILLET4_R * 0.02), (FILLET4_R, -FILLET4_R * 0.02))
            Line((FILLET4_R, -FILLET4_R * 0.02), (FILLET4_R, 0))
        make_face()
    extrude(amount=134, mode=Mode.SUBTRACT)
    with BuildSketch(Plane(origin=(86.5, -54.5, 0), x_dir=(0, 1, 0), z_dir=(1, 0, 0)), Plane(origin=(-104.797557934, -54.5, 0), x_dir=(0, 1, 0), z_dir=(1, 0, 0))) as fillet4_piece_5:
        with BuildLine():
            CenterArc((4.719023174, 5), FILLET4_R, 187.459174119, 82.540825881)
            Line((-0.238664904, 4.350901455), (-0.337818666, 4.337919484))
            ThreePointArc((-0.337818666, 4.337919484), (-0.165294679, 2.173525325), (-0.099945242, -0.003308858))
            Line((-0.099945242, -0.003308858), (0, -0.1))
            Line((0, -0.1), (4.719023174, -0.1))
            Line((4.719023174, -0.1), (4.719023174, 0))
        make_face()
    extrude(amount=18.297557934, mode=Mode.SUBTRACT)


solid = part.part
